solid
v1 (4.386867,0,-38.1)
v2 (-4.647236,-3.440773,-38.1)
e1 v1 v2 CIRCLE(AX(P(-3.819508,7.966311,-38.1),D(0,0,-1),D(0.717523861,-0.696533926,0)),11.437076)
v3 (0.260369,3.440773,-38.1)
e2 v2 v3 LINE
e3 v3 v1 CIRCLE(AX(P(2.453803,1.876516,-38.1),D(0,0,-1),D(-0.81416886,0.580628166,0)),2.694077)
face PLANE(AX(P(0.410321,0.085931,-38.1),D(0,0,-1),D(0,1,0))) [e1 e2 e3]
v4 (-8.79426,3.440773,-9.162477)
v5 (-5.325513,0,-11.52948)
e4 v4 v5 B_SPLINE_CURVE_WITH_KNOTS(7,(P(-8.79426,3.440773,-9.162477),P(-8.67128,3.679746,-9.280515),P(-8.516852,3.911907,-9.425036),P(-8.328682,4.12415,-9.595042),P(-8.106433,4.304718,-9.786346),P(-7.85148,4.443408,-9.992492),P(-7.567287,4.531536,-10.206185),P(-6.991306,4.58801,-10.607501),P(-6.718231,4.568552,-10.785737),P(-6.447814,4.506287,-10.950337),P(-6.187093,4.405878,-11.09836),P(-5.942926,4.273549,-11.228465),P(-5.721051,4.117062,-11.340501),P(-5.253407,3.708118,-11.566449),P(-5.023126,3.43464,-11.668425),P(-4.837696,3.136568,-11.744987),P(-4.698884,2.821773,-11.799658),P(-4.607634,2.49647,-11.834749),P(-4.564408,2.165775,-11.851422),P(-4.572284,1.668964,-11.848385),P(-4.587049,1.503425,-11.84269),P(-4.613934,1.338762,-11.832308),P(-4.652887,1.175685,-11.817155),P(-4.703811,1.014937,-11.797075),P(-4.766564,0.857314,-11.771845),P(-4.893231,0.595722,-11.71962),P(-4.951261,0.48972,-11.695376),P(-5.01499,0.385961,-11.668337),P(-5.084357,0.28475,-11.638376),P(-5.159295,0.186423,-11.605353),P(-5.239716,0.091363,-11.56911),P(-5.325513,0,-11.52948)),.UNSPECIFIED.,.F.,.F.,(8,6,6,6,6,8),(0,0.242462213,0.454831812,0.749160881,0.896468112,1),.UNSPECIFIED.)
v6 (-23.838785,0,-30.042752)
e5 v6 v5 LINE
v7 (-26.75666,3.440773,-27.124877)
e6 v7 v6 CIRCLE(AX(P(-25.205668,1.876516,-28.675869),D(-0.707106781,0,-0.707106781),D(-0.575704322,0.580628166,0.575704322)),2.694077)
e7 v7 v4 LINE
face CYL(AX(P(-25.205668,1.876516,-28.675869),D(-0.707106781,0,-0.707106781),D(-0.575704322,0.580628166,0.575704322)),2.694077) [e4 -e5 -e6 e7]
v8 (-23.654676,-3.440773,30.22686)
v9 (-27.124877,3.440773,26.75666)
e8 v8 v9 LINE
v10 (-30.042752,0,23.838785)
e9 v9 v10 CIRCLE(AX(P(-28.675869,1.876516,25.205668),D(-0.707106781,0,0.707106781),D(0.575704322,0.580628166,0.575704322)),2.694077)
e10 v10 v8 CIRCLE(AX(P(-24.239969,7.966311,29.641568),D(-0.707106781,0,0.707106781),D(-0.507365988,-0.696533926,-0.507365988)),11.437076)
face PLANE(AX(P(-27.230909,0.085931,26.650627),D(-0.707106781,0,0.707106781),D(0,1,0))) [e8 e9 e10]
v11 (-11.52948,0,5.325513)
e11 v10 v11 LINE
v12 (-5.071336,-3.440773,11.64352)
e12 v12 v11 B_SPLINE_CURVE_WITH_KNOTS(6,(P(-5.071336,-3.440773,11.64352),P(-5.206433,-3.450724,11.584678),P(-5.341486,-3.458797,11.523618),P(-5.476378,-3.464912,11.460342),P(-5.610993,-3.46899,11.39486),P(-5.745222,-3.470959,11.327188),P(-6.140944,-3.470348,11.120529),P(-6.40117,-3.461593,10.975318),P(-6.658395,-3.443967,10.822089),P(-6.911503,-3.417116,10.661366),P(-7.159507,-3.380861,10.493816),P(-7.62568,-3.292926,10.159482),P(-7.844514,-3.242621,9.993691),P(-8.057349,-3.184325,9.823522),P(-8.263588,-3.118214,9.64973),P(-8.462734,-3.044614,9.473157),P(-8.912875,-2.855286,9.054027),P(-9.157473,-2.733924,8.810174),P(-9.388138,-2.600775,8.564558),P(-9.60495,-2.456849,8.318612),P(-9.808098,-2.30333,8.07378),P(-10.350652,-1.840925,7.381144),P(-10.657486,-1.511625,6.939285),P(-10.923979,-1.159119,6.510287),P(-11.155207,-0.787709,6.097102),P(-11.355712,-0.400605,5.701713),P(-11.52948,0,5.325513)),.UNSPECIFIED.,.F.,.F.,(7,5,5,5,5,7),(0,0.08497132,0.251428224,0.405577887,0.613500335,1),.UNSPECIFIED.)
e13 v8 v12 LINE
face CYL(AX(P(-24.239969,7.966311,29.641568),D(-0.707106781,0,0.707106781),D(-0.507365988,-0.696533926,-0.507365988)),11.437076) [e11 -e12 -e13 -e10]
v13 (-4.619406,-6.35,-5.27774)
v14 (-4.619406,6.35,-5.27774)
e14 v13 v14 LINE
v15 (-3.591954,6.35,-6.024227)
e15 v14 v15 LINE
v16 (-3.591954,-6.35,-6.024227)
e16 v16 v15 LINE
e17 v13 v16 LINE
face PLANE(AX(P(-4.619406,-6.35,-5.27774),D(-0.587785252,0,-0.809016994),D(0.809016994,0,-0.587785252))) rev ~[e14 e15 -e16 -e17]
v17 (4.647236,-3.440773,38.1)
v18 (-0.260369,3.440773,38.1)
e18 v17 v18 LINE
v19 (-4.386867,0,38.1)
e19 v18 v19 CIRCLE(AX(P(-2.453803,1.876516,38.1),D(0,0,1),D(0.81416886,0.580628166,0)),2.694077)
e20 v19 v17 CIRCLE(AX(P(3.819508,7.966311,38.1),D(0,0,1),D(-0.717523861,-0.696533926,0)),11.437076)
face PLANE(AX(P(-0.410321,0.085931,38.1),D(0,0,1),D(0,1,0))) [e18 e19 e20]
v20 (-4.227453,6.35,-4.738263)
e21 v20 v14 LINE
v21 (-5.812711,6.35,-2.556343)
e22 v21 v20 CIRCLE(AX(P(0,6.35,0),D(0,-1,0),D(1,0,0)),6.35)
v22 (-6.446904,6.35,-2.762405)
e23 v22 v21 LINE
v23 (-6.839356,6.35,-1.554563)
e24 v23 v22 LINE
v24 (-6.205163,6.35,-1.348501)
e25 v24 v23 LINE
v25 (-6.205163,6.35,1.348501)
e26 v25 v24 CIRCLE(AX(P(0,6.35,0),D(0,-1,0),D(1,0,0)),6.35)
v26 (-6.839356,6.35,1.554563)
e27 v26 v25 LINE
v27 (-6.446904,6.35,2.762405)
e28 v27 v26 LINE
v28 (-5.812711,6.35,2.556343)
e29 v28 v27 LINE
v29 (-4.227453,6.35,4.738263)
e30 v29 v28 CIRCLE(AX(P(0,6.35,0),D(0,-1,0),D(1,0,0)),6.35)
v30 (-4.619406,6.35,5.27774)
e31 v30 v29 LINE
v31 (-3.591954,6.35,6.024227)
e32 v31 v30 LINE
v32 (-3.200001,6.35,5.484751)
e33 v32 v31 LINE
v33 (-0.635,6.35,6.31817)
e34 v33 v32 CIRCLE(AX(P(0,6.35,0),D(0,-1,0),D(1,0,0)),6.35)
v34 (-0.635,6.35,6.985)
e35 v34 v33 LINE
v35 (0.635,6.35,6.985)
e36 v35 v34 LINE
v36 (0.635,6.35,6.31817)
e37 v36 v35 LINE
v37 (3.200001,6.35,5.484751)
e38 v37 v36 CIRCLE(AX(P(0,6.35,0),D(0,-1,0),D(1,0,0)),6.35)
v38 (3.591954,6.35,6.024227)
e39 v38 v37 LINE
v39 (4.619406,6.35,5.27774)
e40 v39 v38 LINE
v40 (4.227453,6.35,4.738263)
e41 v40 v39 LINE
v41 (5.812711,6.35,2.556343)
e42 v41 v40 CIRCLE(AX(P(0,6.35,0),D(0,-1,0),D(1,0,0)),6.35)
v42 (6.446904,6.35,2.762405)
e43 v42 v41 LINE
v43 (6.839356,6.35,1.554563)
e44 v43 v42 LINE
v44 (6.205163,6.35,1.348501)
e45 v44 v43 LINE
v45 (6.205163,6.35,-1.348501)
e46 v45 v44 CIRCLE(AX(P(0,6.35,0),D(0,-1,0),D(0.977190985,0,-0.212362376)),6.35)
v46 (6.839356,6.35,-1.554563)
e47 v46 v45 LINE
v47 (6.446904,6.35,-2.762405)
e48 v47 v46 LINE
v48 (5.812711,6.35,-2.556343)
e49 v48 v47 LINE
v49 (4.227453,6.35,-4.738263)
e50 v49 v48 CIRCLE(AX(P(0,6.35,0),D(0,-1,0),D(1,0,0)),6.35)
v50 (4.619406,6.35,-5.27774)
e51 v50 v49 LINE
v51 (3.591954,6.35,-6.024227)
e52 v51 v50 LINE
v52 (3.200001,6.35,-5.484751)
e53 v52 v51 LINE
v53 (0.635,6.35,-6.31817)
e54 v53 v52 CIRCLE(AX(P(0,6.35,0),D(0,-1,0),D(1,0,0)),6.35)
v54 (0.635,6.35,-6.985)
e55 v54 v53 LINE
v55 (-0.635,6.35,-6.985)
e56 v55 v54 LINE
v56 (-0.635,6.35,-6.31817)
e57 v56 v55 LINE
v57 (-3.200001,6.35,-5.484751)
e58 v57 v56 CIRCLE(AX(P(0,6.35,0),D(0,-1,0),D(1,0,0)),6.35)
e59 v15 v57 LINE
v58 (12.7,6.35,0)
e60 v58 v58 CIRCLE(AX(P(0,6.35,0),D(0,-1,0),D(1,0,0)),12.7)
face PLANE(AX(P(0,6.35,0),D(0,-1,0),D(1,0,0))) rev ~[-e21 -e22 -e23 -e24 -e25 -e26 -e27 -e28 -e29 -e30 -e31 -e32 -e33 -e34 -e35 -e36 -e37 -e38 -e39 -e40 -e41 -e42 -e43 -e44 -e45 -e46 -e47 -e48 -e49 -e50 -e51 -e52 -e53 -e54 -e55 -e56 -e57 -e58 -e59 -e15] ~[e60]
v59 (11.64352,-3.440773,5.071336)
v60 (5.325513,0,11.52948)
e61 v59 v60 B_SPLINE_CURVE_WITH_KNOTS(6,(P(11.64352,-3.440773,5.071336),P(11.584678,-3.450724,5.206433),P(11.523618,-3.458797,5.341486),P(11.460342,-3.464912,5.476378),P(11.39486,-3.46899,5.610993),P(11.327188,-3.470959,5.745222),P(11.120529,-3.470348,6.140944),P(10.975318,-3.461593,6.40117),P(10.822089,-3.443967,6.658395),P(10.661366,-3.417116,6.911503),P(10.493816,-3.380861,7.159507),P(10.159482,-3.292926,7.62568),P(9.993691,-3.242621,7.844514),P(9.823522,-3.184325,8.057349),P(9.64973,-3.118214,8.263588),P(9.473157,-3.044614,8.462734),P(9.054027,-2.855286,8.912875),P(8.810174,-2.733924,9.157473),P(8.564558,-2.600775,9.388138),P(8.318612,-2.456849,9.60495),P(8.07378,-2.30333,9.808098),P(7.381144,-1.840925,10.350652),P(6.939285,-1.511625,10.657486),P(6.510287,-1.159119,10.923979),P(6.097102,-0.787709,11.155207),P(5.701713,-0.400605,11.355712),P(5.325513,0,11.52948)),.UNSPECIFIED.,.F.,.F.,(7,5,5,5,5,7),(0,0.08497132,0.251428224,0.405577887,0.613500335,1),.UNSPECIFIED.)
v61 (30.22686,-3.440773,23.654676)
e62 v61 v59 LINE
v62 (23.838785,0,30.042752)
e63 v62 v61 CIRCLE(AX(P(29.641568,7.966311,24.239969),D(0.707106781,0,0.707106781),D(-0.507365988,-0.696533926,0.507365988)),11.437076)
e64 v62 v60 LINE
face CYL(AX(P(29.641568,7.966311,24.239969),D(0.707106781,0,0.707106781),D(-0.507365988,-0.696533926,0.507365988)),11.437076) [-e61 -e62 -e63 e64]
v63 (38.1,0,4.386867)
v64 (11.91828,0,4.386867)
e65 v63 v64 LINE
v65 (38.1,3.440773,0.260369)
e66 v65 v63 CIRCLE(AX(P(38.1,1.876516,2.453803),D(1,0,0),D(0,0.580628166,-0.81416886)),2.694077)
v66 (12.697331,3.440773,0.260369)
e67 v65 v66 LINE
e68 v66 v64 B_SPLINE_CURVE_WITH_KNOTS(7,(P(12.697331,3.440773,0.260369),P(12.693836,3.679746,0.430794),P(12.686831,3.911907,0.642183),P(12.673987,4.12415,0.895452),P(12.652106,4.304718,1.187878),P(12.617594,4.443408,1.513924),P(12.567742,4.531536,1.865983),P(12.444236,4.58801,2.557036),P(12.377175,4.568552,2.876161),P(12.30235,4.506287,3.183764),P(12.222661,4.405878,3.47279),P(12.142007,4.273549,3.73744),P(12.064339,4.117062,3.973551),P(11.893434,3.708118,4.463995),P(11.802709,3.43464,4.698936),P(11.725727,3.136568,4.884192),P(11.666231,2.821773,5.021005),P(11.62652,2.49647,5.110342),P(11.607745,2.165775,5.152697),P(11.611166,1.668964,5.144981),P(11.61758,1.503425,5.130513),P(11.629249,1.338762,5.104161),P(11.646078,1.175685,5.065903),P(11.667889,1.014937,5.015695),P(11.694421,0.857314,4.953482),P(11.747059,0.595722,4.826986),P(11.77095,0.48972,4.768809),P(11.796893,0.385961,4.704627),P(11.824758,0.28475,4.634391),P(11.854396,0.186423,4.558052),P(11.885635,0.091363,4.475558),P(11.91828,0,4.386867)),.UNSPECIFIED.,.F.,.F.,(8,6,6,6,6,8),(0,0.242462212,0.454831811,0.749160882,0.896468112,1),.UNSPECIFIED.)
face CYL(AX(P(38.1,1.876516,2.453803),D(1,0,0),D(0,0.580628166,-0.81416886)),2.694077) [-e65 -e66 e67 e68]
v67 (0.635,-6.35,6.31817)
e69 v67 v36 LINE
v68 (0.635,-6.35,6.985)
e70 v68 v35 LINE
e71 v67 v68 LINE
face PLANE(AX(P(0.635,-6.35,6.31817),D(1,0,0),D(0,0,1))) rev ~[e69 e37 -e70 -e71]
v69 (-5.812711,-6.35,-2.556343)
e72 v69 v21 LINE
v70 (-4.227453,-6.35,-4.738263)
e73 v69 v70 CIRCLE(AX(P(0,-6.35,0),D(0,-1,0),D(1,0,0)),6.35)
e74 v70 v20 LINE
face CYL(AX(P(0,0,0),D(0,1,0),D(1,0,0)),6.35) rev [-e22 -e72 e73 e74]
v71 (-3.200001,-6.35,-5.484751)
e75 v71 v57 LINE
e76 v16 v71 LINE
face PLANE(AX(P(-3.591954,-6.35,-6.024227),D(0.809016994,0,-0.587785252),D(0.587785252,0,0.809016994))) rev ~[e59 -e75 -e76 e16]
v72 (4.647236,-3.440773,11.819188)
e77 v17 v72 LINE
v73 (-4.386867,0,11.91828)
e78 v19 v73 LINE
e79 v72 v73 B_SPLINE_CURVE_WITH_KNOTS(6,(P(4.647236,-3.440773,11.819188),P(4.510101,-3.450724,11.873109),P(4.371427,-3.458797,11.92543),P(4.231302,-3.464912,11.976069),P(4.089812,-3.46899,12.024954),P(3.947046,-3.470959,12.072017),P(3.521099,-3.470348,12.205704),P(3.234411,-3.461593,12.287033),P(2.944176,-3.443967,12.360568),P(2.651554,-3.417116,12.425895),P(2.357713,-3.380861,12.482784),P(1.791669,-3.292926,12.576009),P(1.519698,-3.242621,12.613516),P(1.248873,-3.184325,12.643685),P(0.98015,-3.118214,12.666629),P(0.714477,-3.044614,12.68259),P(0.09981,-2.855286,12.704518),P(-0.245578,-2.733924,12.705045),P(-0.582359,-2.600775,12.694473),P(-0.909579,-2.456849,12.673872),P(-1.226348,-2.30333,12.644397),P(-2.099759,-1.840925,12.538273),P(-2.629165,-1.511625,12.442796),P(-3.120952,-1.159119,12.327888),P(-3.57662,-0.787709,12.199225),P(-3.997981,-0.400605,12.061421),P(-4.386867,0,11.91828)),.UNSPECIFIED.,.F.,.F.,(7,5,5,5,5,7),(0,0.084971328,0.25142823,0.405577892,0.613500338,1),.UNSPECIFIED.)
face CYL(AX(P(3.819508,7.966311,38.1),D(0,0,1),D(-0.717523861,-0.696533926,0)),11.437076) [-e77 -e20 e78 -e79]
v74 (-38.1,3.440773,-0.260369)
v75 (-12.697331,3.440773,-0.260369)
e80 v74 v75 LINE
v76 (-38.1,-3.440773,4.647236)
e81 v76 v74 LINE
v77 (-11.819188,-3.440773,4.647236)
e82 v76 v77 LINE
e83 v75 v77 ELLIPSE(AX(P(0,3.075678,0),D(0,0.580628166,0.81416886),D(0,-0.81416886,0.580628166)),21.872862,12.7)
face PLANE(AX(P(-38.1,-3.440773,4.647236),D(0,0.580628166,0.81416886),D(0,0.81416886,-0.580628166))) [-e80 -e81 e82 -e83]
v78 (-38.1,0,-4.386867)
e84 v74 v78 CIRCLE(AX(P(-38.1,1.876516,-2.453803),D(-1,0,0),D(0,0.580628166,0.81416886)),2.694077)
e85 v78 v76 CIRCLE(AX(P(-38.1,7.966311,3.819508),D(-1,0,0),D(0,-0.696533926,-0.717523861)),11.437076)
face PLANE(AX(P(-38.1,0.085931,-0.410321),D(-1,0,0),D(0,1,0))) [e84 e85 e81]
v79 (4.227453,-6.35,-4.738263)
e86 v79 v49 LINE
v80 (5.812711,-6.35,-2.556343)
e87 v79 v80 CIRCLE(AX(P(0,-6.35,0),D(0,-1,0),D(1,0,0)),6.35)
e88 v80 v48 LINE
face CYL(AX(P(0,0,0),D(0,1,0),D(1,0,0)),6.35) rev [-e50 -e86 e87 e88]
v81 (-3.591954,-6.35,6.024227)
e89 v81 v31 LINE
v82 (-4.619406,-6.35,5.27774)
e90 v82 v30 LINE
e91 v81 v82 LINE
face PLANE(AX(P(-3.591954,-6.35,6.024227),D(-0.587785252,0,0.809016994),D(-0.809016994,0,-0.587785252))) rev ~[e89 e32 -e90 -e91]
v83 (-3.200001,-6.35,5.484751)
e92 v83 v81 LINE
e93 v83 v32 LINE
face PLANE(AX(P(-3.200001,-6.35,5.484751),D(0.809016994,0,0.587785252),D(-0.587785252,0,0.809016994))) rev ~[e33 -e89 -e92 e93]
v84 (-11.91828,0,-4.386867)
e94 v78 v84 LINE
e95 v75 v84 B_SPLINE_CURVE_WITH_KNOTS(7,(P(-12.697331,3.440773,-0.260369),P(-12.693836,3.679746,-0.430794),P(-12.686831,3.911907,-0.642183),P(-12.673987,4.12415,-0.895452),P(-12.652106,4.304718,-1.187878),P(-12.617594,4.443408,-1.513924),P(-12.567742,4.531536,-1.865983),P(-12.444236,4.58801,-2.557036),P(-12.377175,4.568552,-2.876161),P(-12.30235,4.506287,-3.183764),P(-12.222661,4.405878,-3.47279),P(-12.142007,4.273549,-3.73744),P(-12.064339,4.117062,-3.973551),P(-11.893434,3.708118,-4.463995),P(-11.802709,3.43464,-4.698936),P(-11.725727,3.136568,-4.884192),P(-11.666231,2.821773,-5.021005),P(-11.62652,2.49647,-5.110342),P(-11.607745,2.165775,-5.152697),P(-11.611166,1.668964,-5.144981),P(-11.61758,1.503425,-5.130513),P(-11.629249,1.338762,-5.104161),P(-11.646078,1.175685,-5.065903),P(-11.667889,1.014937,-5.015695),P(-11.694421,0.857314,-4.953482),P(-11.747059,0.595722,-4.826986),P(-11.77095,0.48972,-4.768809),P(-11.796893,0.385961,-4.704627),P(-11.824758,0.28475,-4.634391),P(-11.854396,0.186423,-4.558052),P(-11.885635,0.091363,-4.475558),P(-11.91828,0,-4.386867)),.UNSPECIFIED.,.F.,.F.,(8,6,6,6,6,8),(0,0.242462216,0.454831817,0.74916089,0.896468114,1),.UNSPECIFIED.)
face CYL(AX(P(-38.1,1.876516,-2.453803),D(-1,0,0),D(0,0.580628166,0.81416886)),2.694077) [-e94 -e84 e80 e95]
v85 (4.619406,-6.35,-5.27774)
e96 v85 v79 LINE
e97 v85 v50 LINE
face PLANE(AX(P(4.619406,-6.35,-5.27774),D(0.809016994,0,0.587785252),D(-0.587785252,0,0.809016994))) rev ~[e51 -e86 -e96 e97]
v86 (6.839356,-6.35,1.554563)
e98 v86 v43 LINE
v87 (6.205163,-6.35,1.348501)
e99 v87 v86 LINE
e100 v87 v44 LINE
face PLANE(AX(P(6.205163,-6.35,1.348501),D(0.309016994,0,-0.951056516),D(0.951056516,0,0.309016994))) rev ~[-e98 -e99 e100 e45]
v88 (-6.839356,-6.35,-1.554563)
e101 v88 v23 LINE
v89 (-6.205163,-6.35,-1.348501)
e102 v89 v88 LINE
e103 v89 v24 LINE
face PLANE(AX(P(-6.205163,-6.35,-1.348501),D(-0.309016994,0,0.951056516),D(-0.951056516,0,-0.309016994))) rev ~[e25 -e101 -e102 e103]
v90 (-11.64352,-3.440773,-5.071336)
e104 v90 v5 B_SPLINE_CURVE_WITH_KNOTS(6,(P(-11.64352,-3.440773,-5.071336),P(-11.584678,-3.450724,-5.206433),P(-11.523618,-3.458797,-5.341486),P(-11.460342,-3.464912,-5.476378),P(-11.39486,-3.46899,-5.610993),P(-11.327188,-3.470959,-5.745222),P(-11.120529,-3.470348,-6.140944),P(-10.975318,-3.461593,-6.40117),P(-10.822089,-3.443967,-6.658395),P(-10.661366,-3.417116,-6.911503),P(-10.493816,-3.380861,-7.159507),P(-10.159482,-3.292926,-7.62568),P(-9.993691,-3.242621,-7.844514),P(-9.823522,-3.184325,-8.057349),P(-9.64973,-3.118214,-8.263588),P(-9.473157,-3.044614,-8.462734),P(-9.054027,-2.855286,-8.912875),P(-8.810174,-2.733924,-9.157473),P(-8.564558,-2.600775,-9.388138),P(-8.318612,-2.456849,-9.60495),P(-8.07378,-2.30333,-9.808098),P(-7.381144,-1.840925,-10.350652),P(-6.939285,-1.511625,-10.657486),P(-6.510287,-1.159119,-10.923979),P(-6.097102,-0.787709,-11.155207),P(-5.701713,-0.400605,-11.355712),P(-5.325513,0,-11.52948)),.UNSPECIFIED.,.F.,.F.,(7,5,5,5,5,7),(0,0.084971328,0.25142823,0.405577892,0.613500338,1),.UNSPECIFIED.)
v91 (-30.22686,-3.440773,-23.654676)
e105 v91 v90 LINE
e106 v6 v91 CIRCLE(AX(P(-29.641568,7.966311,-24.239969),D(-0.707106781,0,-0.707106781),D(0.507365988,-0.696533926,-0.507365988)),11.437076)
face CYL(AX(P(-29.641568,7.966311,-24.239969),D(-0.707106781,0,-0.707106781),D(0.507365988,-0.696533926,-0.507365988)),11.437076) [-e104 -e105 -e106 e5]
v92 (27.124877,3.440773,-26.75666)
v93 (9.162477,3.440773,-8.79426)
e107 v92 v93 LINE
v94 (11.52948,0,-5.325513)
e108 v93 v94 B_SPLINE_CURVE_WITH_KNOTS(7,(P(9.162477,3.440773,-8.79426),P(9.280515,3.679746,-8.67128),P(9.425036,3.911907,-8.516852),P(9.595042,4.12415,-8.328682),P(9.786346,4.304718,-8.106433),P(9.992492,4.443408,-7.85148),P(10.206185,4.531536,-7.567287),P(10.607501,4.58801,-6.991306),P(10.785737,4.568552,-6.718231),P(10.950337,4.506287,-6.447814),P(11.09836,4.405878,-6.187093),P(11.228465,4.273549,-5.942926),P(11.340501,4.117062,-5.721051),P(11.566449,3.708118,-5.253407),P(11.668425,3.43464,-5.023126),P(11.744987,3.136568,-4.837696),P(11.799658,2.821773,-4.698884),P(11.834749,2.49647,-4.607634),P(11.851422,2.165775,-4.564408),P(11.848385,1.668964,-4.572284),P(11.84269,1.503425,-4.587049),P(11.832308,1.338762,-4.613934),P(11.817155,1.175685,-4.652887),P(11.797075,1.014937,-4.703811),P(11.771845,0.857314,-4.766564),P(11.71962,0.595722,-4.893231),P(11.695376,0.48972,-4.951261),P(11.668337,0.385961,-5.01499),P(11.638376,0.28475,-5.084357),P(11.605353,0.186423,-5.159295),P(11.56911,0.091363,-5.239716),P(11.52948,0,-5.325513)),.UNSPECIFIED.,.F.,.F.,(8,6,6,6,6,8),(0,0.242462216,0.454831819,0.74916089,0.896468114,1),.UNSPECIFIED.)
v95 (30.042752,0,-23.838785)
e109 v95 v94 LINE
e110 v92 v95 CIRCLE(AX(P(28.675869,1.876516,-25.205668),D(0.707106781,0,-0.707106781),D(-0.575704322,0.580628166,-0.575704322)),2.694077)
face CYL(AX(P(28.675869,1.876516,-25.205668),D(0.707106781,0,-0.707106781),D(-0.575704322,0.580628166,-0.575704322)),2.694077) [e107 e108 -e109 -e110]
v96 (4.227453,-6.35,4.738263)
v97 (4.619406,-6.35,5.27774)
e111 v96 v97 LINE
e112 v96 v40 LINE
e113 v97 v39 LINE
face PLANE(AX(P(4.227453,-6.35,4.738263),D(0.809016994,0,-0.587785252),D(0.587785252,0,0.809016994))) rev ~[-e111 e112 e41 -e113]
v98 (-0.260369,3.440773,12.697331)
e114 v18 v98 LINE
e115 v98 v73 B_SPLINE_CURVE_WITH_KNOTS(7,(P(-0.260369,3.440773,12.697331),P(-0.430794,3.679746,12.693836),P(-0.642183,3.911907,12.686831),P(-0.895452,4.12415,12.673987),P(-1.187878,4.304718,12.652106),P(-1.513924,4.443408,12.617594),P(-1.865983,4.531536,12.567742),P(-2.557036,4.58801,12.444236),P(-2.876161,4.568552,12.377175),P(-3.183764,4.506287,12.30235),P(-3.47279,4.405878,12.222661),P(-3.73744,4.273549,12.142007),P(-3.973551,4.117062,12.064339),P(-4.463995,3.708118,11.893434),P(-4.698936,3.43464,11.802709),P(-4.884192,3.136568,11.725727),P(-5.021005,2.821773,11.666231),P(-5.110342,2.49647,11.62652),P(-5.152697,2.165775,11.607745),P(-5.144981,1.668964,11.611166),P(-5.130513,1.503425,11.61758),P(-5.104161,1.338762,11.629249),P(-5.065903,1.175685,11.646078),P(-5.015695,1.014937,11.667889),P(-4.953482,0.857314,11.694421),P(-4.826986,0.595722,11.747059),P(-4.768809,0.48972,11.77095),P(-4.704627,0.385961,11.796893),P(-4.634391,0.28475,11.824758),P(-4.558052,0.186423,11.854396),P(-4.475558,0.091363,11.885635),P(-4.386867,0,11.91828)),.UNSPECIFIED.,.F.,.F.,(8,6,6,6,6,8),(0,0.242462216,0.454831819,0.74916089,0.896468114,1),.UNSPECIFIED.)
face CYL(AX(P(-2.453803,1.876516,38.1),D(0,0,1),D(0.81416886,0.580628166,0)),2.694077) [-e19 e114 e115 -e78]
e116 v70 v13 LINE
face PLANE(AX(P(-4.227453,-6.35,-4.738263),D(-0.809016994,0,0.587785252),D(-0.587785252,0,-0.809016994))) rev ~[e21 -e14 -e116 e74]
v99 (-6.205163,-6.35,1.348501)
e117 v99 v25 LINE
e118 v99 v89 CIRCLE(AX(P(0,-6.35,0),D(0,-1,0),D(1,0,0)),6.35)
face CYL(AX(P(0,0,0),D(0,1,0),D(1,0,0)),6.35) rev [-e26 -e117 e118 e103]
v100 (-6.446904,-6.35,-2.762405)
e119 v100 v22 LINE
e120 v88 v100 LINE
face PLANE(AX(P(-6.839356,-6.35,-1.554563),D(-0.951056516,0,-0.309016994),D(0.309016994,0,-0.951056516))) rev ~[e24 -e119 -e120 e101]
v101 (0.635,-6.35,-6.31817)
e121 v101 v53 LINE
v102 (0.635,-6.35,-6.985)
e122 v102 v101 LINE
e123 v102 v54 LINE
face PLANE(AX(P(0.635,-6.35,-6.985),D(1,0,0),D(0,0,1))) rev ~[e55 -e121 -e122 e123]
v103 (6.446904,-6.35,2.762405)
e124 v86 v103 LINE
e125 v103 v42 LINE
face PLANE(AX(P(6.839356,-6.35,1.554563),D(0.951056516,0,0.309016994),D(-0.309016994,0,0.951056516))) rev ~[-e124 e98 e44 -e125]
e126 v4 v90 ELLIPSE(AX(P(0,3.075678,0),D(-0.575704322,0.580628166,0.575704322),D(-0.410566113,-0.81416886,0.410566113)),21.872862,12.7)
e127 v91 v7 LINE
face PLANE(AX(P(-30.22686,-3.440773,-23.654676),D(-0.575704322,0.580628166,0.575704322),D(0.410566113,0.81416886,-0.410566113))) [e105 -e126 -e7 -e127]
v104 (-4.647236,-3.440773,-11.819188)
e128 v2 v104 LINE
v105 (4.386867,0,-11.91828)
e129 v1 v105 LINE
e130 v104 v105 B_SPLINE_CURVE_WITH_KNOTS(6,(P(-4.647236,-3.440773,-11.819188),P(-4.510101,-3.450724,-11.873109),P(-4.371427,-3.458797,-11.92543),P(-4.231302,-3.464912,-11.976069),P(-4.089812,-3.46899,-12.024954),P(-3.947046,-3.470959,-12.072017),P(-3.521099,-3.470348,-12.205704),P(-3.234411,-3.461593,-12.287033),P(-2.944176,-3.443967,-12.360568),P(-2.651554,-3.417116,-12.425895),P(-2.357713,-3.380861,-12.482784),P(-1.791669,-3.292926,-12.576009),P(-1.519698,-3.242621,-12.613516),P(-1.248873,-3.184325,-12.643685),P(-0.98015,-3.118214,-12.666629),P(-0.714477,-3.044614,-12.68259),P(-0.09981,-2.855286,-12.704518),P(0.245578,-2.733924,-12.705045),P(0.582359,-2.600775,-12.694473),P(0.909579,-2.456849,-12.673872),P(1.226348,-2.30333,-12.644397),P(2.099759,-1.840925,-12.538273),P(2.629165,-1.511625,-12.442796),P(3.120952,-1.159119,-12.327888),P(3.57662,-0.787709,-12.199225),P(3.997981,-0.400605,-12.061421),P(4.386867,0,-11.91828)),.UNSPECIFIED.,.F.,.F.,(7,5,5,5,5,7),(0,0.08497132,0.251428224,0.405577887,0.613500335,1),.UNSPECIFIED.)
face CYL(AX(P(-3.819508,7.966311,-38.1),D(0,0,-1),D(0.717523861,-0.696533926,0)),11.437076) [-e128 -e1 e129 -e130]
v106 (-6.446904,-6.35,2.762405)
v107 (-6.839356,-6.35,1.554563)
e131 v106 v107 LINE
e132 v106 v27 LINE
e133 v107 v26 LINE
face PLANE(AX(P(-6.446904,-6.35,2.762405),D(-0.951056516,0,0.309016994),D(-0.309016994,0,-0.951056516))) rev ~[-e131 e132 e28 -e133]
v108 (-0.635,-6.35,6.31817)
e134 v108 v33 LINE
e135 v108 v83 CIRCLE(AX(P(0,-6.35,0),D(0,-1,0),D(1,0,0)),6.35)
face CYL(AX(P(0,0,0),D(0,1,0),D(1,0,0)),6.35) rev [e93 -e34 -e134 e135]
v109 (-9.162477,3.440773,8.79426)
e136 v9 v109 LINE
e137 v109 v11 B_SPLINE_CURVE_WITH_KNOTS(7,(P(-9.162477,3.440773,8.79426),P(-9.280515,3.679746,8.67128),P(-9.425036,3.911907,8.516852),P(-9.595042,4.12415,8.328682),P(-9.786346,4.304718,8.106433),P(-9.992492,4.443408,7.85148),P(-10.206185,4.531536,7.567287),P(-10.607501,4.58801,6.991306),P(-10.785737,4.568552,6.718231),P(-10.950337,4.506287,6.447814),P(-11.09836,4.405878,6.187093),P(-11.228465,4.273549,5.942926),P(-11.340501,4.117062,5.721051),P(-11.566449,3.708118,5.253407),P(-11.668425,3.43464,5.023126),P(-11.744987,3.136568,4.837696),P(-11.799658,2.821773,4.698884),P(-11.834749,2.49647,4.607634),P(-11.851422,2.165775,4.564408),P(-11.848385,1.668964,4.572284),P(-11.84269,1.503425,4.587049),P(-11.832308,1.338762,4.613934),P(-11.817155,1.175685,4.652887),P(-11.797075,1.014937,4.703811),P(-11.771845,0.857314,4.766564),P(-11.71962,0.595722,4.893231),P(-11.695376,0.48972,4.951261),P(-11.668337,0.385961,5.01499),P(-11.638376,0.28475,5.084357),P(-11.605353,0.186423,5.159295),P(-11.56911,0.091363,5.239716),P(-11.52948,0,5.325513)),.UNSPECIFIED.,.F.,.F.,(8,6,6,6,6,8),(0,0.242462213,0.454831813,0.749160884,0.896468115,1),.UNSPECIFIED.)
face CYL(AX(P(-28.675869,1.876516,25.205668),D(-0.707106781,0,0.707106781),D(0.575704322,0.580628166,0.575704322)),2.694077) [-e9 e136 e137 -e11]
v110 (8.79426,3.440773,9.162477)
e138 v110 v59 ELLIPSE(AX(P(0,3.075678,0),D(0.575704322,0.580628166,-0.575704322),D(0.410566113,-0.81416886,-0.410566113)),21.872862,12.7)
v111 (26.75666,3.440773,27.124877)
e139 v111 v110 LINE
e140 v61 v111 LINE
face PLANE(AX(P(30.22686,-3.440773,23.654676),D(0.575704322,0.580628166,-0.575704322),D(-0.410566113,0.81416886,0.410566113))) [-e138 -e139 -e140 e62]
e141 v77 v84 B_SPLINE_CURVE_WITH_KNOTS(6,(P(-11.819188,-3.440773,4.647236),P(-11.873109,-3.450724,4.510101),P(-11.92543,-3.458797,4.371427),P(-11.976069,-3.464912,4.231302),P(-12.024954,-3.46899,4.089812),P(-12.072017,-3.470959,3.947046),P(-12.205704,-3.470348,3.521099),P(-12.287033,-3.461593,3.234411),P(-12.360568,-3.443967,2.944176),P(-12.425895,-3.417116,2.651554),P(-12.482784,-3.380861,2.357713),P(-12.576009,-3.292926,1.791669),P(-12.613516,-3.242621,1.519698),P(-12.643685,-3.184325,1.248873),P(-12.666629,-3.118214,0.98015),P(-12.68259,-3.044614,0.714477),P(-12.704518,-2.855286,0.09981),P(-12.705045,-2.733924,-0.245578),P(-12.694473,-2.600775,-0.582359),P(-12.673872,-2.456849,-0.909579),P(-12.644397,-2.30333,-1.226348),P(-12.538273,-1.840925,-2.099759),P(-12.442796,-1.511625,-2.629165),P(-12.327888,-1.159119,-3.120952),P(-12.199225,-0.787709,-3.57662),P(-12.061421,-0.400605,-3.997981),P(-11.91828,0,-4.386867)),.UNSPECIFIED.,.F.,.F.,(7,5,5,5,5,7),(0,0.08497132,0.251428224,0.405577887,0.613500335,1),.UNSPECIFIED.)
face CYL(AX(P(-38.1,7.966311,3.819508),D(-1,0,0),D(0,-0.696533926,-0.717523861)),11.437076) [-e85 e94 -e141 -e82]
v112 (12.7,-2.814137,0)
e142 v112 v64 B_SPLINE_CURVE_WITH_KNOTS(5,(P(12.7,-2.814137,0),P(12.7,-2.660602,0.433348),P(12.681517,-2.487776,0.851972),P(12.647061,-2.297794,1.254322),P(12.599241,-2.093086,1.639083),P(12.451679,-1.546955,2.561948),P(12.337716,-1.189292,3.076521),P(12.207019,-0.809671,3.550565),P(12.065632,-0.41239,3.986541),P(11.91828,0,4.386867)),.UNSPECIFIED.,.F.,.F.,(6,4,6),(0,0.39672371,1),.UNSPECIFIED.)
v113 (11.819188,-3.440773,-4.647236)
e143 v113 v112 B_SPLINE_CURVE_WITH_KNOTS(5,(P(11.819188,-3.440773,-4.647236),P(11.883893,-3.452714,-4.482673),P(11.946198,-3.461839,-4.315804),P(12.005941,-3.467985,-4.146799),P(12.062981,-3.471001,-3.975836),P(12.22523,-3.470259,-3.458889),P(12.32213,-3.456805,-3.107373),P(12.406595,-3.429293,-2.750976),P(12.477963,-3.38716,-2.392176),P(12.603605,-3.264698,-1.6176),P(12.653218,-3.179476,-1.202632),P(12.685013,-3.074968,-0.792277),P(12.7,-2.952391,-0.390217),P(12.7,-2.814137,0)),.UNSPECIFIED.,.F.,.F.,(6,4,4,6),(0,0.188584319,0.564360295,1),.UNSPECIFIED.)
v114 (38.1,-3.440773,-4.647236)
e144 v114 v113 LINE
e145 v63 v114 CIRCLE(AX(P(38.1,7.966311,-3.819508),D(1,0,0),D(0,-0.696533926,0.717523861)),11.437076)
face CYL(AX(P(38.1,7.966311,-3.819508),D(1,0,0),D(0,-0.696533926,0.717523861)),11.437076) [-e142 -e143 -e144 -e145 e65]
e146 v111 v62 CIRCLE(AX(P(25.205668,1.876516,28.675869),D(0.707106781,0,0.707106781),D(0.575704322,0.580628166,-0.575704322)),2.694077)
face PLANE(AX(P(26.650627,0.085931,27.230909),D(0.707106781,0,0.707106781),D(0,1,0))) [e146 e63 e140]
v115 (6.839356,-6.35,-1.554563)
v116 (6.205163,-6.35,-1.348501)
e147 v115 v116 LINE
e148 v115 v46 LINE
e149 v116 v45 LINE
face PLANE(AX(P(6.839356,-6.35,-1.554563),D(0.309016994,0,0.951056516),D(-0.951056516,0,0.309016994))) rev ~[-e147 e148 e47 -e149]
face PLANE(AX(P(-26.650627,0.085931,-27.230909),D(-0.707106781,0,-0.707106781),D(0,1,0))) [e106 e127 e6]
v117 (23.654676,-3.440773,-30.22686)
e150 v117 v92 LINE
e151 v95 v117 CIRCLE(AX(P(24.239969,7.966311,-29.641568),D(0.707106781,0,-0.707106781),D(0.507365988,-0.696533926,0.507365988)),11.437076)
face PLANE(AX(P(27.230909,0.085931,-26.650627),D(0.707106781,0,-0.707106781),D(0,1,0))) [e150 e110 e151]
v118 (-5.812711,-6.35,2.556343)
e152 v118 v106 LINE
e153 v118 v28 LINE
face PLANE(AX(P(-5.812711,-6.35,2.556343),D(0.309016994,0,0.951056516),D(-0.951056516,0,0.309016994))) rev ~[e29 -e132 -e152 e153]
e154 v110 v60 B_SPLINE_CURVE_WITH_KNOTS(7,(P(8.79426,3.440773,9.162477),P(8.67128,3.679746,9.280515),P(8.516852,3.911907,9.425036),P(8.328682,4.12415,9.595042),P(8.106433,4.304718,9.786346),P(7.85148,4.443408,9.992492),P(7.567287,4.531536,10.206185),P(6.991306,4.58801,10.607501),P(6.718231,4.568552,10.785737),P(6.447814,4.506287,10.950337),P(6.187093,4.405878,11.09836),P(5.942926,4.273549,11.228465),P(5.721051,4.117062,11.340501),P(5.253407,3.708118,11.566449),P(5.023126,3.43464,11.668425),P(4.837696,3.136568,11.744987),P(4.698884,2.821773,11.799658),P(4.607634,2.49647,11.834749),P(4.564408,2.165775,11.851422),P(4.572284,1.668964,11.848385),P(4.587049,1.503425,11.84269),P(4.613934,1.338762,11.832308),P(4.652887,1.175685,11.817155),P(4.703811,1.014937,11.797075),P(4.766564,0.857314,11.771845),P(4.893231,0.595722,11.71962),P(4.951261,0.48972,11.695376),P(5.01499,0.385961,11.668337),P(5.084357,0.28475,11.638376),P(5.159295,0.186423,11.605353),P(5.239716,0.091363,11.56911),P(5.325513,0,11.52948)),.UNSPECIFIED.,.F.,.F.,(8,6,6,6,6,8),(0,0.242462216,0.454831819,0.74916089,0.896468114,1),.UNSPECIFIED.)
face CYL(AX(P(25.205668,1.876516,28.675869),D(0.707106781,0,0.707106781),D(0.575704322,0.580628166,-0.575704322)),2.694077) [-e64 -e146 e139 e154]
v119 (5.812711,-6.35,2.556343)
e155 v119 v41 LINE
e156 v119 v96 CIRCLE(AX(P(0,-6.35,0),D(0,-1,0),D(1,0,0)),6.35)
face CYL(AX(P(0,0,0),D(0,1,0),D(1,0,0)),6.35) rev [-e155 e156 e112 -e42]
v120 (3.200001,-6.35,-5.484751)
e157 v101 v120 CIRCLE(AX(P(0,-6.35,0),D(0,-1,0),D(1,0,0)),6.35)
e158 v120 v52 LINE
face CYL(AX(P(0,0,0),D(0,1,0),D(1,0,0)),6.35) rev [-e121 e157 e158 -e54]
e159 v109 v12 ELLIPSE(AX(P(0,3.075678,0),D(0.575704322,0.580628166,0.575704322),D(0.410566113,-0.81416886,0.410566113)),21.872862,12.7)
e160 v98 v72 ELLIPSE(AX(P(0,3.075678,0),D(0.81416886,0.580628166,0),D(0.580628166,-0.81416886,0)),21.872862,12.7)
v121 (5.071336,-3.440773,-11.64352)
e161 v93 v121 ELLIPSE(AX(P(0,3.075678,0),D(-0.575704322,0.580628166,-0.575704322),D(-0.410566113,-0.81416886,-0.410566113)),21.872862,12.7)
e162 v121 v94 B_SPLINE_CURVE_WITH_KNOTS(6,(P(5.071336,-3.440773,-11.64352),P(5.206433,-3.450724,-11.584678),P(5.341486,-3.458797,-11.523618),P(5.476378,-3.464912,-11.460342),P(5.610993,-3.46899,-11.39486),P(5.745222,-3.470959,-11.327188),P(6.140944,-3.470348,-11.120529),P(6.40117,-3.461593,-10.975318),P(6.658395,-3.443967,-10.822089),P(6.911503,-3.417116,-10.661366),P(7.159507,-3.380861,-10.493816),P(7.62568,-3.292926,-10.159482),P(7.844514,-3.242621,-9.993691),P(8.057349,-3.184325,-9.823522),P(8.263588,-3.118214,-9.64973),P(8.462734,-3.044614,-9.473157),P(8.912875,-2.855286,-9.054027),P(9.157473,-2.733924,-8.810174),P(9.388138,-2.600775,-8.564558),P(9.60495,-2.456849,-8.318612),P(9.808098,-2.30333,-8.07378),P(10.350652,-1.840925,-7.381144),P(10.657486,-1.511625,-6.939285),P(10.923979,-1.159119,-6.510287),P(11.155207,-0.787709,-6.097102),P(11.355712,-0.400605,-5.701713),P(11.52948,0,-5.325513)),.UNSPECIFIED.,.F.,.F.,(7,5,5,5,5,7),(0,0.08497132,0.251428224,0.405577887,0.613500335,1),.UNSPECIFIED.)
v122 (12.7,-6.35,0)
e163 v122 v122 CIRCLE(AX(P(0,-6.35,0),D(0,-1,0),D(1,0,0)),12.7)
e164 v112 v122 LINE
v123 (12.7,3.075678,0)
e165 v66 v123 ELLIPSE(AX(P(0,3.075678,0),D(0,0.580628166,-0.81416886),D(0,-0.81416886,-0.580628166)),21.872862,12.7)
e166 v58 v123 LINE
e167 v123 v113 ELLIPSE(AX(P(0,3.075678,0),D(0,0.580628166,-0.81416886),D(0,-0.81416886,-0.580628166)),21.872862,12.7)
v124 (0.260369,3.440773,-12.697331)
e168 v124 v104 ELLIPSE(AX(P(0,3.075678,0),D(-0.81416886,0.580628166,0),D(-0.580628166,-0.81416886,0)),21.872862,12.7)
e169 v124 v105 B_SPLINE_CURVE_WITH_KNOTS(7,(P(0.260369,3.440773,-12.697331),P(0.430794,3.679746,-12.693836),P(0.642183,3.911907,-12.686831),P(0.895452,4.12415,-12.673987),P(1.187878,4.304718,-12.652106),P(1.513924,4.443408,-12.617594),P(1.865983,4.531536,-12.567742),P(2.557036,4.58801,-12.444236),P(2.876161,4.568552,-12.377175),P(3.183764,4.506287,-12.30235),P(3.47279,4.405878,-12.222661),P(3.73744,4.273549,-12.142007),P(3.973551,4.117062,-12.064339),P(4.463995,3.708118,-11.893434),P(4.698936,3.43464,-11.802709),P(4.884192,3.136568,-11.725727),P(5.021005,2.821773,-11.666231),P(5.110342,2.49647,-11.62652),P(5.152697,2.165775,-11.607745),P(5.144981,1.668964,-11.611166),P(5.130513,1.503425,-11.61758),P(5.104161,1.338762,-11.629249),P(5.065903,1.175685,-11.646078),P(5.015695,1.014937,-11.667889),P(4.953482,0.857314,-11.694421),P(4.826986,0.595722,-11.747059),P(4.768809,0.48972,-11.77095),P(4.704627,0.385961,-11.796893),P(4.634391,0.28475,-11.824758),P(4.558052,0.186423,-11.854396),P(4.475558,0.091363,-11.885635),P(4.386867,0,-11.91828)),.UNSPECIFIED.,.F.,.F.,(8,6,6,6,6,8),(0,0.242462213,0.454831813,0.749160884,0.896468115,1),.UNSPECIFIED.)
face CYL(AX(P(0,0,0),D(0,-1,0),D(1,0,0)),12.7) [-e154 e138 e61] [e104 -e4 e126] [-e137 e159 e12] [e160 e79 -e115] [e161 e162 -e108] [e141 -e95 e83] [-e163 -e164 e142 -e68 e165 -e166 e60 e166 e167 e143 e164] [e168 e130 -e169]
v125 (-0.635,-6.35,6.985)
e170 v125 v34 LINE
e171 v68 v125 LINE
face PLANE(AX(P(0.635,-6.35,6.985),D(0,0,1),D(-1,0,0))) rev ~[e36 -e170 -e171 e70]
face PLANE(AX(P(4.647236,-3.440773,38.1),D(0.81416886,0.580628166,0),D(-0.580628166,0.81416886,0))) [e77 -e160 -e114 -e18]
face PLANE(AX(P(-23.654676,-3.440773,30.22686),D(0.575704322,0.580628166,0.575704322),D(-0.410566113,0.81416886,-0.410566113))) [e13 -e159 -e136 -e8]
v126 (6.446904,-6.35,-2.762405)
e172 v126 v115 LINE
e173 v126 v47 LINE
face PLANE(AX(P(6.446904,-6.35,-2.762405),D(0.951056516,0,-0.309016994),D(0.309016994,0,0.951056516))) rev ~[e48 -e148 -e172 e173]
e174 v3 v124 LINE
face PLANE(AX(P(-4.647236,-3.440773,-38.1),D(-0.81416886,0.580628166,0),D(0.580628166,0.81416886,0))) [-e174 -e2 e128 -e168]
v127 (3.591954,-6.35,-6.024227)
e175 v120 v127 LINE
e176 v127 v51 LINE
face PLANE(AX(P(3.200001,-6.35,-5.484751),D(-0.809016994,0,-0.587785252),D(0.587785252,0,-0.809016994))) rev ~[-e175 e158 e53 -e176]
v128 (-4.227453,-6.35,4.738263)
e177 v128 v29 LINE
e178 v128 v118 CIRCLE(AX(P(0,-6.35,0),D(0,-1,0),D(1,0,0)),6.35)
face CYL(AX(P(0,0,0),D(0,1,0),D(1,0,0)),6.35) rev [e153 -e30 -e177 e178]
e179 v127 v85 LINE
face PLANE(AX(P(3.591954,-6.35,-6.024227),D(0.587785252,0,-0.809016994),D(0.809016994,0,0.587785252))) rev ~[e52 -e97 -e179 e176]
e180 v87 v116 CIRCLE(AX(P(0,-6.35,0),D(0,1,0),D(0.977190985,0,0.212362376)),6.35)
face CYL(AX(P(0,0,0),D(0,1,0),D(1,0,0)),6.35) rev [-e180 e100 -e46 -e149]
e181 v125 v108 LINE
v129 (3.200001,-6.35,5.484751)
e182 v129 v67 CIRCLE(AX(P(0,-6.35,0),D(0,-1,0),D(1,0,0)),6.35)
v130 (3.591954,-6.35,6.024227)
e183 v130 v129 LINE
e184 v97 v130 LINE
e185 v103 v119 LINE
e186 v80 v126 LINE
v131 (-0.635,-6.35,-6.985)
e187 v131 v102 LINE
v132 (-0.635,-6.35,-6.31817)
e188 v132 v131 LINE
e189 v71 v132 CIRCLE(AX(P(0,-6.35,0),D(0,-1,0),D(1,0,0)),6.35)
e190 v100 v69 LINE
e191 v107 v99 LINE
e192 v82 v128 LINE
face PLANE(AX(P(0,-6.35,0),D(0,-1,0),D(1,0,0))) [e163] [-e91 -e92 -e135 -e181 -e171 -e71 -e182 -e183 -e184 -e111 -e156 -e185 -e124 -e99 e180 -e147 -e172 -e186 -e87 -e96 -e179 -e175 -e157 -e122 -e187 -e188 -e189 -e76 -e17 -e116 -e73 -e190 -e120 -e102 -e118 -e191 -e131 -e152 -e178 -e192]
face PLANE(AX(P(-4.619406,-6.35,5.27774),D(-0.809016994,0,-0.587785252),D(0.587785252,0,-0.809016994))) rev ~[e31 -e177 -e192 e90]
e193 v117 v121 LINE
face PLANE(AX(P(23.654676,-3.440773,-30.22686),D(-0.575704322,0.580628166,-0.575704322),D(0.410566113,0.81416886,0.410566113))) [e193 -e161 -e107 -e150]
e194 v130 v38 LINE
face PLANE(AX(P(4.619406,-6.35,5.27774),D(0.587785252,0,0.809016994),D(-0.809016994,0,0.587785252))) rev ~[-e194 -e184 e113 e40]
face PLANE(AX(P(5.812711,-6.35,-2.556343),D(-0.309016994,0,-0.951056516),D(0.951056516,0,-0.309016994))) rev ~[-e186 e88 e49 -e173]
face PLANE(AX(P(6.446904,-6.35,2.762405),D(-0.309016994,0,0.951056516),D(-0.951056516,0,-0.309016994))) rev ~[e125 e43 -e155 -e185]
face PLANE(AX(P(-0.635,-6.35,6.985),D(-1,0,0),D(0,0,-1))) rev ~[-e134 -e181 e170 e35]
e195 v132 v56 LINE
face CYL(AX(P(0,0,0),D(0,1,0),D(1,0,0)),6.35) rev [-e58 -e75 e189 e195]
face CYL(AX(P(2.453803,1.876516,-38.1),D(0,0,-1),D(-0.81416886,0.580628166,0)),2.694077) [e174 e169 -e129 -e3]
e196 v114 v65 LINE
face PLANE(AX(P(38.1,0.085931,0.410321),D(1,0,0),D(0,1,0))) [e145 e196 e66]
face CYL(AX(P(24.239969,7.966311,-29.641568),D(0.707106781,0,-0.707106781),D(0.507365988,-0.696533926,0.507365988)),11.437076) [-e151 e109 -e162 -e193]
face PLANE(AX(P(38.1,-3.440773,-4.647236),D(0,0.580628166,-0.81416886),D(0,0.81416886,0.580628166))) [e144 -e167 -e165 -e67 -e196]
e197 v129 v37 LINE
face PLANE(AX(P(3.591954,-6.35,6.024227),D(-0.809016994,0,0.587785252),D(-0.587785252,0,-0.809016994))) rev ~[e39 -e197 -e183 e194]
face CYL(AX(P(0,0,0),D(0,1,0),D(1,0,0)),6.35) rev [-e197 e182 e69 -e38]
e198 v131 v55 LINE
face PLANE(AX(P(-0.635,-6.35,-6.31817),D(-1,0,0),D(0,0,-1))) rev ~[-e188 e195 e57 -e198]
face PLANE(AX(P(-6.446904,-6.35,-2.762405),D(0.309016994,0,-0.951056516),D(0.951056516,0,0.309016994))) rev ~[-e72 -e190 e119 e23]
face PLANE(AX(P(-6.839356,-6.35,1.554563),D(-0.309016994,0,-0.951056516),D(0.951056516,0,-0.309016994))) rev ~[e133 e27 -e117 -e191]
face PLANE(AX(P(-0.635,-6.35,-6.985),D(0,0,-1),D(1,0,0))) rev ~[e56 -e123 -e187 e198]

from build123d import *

# Parameters (mm, degrees)
F0_R            = 12.7
F0_R_2          = 6.35
F1_DEPTH        = 6.35
F4_DEPTH        = 25.4
F7_DEPTH        = 30.48
F7_COPIES_COUNT = 8


# Not quite as in the source:
# - a pattern or mirror of a feature is missing from the dataset's text; its kind, count and spacing are read off the source's solid


with BuildPart() as f1:
    # F0 (on Front) → F1 (new body, symmetric)
    with BuildSketch(Plane.XZ):
        Circle(F0_R)
        Circle(F0_R_2, mode=Mode.SUBTRACT)
    extrude(amount=F1_DEPTH, both=True)

    # F3 (on offset) → F4 (cut)
    with BuildSketch(Plane.XZ.offset(6.35)):
        with BuildLine():
            Line((-3.2000014887, 5.4847507211), (-3.5919541958, 6.0242273409))
            Line((-3.5919541958, 6.0242273409), (-4.6194057787, 5.2777400705))
            Line((-4.6194057787, 5.2777400705), (-4.2274530715, 4.7382634507))
            ThreePointArc((-4.2274530715, 4.7382634507), (-3.7324363521, 5.1372579143), (-3.2000014887, 5.4847507211))
        make_face()
        with BuildLine():
            ThreePointArc((-0.635, 6.3181702256), (0, 6.35), (0.635, 6.3181702256))
            Line((0.635, 6.3181702256), (0.635, 6.985))
            Line((0.635, 6.985), (-0.635, 6.985))
            Line((-0.635, 6.985), (-0.635, 6.3181702256))
        make_face()
        with BuildLine():
            Line((4.2274530715, 4.7382634507), (4.6194057787, 5.2777400705))
            Line((4.6194057787, 5.2777400705), (3.5919541958, 6.0242273409))
            Line((3.5919541958, 6.0242273409), (3.2000014887, 5.4847507211))
            ThreePointArc((3.2000014887, 5.4847507211), (3.7324363521, 5.1372579143), (4.2274530715, 4.7382634507))
        make_face()
        with BuildLine():
            Line((6.2051627556, 1.3485010852), (6.8393555577, 1.5545628179))
            Line((6.8393555577, 1.5545628179), (6.4469039749, 2.7624045936))
            Line((6.4469039749, 2.7624045936), (5.8127111727, 2.5563428609))
            ThreePointArc((5.8127111727, 2.5563428609), (6.0392088785, 1.9622579143), (6.2051627556, 1.3485010852))
        make_face()
        with BuildLine():
            Line((5.8127111727, -2.5563428609), (6.4469039749, -2.7624045936))
            Line((6.4469039749, -2.7624045936), (6.8393555577, -1.5545628179))
            Line((6.8393555577, -1.5545628179), (6.2051627556, -1.3485010852))
            ThreePointArc((6.2051627556, -1.3485010852), (6.0392088785, -1.9622579143), (5.8127111727, -2.5563428609))
        make_face()
        with BuildLine():
            Line((-6.2051627556, -1.3485010852), (-6.8393555577, -1.5545628179))
            Line((-6.8393555577, -1.5545628179), (-6.4469039749, -2.7624045936))
            Line((-6.4469039749, -2.7624045936), (-5.8127111727, -2.5563428609))
            ThreePointArc((-5.8127111727, -2.5563428609), (-6.0392088785, -1.9622579143), (-6.2051627556, -1.3485010852))
        make_face()
        with BuildLine():
            Line((-5.8127111727, 2.5563428609), (-6.4469039749, 2.7624045936))
            Line((-6.4469039749, 2.7624045936), (-6.8393555577, 1.5545628179))
            Line((-6.8393555577, 1.5545628179), (-6.2051627556, 1.3485010852))
            ThreePointArc((-6.2051627556, 1.3485010852), (-6.0392088785, 1.9622579143), (-5.8127111727, 2.5563428609))
        make_face()
        with BuildLine():
            Line((-4.2274530715, -4.7382634507), (-4.6194057787, -5.2777400705))
            Line((-4.6194057787, -5.2777400705), (-3.5919541958, -6.0242273409))
            Line((-3.5919541958, -6.0242273409), (-3.2000014887, -5.4847507211))
            ThreePointArc((-3.2000014887, -5.4847507211), (-3.7324363521, -5.1372579143), (-4.2274530715, -4.7382634507))
        make_face()
        with BuildLine():
            Line((-0.635, -6.3181702256), (-0.635, -6.985))
            Line((-0.635, -6.985), (0.635, -6.985))
            Line((0.635, -6.985), (0.635, -6.3181702256))
            ThreePointArc((0.635, -6.3181702256), (0, -6.35), (-0.635, -6.3181702256))
        make_face()
        with BuildLine():
            Line((3.2000014887, -5.4847507211), (3.5919541958, -6.0242273409))
            Line((3.5919541958, -6.0242273409), (4.6194057787, -5.2777400705))
            Line((4.6194057787, -5.2777400705), (4.2274530715, -4.7382634507))
            ThreePointArc((4.2274530715, -4.7382634507), (3.7324363521, -5.1372579143), (3.2000014887, -5.4847507211))
        make_face()
    extrude(amount=-F4_DEPTH, mode=Mode.SUBTRACT)

    # F6 (on offset) → F7 (join)
    with BuildSketch(Plane.YZ.offset(38.1)):
        with BuildLine():
            ThreePointArc((0, 4.386866935), (-2.7218067049, 0.2512213266), (-3.4407728063, -4.64723599))
            Line((-3.4407728063, -4.64723599), (3.4407728063, 0.260369055))
            ThreePointArc((3.4407728063, 0.260369055), (3.9456637131, 4.1791075354), (0, 4.386866935))
        make_face()
    f7 = extrude(amount=-F7_DEPTH)

    # F7_copies: F7 ×8 about axis
    f7_copies_axis = Axis((0, 0, 0), (0, 1, 0))
    for i in range(1, F7_COPIES_COUNT):
        add(f7.rotate(f7_copies_axis, i * 360 / F7_COPIES_COUNT))


solid = f1.part
